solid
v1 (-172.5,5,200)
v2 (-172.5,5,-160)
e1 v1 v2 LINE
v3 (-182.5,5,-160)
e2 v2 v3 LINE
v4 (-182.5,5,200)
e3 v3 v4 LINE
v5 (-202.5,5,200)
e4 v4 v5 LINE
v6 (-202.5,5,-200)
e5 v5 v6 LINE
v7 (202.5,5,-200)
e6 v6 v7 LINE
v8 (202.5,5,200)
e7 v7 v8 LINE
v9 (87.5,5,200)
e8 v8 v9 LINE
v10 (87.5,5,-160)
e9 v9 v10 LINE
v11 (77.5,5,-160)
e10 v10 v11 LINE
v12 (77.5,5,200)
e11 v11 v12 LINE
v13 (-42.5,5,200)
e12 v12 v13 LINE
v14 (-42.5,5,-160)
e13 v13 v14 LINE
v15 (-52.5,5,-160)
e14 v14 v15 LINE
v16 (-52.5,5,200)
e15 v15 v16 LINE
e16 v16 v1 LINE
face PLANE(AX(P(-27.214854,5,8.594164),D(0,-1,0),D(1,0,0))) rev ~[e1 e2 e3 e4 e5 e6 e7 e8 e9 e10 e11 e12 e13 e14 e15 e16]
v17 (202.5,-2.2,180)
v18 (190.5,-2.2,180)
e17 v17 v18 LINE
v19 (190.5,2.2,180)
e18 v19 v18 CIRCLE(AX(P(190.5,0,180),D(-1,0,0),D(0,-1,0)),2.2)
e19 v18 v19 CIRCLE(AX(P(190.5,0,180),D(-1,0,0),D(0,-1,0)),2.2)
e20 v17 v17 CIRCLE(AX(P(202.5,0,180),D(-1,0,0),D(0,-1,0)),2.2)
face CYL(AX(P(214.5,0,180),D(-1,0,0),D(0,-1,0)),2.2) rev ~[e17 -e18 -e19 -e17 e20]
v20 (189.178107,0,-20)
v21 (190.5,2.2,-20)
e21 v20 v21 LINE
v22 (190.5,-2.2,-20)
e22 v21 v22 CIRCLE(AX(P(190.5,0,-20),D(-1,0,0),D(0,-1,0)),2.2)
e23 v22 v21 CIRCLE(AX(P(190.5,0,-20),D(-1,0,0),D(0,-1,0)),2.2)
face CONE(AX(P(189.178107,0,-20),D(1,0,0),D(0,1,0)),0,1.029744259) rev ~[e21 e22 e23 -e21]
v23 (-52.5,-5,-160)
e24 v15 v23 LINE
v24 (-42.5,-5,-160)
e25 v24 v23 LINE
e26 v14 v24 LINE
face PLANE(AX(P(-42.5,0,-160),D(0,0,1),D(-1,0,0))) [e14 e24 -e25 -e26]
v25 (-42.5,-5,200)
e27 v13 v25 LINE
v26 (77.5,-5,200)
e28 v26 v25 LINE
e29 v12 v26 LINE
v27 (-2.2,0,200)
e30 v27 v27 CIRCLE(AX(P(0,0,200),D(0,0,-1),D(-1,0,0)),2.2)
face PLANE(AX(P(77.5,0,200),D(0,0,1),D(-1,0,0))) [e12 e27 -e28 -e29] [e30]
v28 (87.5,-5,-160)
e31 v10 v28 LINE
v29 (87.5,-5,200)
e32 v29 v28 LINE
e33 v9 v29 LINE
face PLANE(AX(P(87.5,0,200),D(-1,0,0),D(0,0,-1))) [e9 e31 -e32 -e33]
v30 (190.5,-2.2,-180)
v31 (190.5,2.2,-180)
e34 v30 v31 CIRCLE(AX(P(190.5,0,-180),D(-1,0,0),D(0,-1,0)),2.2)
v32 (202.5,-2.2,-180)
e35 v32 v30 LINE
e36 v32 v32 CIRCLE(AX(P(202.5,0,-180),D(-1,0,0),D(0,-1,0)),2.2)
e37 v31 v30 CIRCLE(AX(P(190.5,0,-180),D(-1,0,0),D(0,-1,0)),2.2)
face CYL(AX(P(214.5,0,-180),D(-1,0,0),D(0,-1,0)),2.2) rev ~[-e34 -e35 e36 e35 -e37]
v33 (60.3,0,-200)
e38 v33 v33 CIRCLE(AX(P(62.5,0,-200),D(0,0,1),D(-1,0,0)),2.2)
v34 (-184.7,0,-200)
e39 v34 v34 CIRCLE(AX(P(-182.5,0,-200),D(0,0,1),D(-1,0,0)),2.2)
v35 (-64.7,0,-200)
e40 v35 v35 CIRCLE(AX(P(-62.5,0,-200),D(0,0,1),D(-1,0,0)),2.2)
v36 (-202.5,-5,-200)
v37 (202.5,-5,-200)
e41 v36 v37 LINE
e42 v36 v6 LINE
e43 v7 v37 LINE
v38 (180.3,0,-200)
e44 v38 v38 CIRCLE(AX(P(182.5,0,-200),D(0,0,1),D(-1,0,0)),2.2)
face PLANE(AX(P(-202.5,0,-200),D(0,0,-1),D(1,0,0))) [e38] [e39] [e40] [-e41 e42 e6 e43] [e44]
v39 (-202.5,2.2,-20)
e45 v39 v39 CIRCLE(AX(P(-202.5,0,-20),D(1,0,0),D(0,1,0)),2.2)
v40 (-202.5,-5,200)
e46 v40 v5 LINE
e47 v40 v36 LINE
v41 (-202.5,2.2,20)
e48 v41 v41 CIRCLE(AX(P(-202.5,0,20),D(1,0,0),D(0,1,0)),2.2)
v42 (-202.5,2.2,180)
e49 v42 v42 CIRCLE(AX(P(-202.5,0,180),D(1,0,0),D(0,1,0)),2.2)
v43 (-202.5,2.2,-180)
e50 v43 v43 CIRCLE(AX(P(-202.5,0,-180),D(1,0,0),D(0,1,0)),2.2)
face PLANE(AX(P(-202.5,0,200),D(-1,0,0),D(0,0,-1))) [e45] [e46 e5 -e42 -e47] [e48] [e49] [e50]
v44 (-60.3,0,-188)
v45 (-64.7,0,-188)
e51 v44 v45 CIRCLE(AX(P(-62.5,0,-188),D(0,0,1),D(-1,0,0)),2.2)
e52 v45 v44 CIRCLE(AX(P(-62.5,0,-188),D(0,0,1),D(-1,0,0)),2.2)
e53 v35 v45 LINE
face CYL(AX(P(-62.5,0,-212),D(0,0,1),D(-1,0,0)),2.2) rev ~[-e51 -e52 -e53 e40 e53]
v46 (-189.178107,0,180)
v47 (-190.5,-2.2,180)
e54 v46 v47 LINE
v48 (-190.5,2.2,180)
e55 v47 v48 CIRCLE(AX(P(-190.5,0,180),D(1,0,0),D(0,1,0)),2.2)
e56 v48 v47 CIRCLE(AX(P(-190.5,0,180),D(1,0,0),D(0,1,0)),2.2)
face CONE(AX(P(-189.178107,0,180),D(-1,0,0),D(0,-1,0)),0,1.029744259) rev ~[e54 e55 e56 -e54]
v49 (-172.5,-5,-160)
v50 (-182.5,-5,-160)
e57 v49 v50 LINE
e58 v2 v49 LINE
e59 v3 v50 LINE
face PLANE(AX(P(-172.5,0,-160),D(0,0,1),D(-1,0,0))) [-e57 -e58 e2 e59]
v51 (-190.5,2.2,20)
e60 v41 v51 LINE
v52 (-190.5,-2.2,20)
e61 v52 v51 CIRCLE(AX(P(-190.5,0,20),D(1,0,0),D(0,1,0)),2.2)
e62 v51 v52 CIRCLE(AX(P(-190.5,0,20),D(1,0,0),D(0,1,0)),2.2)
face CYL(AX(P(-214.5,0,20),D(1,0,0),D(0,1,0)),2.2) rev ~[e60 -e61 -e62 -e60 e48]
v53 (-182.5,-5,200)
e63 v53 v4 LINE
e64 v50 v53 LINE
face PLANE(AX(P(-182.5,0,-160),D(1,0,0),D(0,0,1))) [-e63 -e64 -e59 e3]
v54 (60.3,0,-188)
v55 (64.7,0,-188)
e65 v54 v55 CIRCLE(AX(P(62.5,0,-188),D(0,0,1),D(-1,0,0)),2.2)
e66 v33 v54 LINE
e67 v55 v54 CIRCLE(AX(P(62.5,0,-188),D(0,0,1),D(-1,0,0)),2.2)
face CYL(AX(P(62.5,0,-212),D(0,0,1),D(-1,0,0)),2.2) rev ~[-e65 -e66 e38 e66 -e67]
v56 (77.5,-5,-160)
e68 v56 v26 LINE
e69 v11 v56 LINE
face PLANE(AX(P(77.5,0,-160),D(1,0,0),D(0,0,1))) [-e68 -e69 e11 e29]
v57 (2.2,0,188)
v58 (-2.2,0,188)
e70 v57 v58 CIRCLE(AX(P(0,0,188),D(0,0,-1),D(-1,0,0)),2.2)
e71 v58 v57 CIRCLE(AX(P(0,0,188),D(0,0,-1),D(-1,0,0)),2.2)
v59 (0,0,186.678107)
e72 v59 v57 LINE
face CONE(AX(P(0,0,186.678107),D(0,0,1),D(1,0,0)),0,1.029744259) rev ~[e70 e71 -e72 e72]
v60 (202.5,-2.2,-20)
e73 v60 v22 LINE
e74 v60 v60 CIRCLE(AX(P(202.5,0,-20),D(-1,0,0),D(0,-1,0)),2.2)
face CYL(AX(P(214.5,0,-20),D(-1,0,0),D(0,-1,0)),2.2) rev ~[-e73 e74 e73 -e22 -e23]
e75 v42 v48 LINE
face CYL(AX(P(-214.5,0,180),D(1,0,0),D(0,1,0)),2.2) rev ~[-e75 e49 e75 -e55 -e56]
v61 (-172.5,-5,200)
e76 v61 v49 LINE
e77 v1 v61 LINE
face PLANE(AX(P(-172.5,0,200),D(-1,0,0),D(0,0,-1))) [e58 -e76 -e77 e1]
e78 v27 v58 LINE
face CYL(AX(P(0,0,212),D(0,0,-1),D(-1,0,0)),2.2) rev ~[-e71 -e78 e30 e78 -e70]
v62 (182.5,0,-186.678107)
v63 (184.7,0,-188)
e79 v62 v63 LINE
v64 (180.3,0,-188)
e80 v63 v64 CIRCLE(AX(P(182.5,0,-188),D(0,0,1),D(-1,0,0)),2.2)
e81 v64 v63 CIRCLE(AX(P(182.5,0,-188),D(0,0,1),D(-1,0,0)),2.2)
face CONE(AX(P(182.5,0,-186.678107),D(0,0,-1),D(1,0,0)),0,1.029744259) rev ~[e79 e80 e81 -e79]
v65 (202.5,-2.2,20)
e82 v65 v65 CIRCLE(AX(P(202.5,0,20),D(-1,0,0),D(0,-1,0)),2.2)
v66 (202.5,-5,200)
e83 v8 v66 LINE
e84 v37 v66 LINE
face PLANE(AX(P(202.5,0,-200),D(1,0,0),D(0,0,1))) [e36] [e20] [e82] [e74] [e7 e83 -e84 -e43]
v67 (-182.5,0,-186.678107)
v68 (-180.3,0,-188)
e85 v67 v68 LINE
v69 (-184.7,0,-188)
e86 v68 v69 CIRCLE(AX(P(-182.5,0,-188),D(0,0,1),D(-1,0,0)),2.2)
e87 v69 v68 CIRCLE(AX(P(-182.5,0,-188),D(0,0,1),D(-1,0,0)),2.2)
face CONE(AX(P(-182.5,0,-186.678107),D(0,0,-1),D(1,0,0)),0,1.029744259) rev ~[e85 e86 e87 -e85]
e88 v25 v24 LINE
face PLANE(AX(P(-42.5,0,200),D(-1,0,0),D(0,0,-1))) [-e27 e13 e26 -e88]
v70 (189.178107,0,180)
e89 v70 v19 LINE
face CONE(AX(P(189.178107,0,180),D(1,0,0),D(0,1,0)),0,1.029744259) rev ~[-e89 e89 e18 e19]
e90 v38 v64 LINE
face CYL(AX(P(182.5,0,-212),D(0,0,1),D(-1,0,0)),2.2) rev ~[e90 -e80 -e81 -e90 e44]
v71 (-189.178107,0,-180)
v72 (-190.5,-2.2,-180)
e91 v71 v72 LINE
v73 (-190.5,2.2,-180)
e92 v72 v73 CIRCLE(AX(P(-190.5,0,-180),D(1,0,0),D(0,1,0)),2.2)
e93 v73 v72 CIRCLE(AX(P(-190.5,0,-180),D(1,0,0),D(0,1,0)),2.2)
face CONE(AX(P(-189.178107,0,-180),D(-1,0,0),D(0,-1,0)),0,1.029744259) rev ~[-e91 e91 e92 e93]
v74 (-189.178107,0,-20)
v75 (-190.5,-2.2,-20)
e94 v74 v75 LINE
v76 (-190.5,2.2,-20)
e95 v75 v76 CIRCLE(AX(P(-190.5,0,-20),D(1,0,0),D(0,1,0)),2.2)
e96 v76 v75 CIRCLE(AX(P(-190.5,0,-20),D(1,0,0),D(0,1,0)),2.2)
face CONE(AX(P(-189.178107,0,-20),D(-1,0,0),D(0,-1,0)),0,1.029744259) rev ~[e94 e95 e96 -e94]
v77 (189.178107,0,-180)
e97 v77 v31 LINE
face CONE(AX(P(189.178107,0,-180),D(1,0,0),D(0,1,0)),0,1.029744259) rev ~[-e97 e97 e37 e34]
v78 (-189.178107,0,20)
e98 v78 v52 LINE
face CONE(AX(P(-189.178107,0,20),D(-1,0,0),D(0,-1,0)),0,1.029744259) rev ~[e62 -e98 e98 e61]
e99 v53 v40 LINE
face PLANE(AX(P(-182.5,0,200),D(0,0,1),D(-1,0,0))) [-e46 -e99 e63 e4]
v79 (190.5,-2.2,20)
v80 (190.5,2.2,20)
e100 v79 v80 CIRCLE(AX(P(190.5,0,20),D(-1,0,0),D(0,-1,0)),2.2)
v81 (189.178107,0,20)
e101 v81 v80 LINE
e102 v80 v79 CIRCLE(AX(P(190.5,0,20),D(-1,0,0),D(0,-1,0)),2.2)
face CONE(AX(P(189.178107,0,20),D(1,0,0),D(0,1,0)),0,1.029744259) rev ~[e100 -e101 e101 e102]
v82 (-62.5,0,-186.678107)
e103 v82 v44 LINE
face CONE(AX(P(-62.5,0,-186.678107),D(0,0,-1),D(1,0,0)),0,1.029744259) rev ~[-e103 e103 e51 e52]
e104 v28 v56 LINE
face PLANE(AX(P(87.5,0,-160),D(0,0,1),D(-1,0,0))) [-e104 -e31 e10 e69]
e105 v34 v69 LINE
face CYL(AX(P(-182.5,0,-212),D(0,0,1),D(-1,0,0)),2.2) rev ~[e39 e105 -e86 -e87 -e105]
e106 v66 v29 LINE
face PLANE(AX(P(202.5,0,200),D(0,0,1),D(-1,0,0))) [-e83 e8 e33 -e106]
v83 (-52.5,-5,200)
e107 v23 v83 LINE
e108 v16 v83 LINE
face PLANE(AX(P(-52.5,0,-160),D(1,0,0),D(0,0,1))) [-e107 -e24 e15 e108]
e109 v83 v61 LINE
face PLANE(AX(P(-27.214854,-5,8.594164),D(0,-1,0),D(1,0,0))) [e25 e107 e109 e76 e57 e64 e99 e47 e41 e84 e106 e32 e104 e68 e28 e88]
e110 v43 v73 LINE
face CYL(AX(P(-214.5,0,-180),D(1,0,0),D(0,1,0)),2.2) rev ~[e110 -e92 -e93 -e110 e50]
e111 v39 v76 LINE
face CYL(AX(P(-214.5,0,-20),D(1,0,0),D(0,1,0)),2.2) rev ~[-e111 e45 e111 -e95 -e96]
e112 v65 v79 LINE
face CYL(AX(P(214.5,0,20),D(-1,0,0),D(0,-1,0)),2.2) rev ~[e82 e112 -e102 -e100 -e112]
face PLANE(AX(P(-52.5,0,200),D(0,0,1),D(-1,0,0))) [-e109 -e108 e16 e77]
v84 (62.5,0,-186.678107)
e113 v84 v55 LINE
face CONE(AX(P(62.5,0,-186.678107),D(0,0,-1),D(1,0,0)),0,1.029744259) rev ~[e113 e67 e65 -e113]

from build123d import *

# Parameters (mm, degrees)
F1_DEPTH       = 5
F6_D           = 4.4
F6_DEPTH       = 12
F6_TIP         = 1.3218933619
F7_D           = 4.4
F7_DEPTH       = 12
F7_TIP         = 1.3218933619
F7_ON_F4_D     = 4.4
F7_ON_F4_DEPTH = 12
F7_ON_F4_TIP   = 1.3218933619
F7_ON_F5_D     = 4.4
F7_ON_F5_DEPTH = 12
F7_ON_F5_TIP   = 1.3218933619


# Not quite as in the source:
# - a feature names something its author has since deleted; it is built from what else it names


with BuildPart() as f1:
    # F0 (on Front) → F1 (new body, symmetric)
    with BuildSketch(Plane.XZ):
        Polygon((-202.5, -200), (202.5, -200), (202.5, 200), (87.5, 200), (87.5, -160), (77.5, -160), (77.5, 200), (-42.5, 200), (-42.5, -160), (-52.5, -160), (-52.5, 200), (-172.5, 200), (-172.5, -160), (-182.5, -160), (-182.5, 200), (-202.5, 200), align=None)
    extrude(amount=F1_DEPTH, both=True)

    # F6
    with Locations(Plane.XY.offset(200)):
        with Locations((0, 0)):
            Hole(F6_D / 2, depth=F6_DEPTH)
            with Locations((0, 0, -(F6_DEPTH + F6_TIP / 2))):  # 118° drill point
                Cone(0, F6_D / 2, F6_TIP, mode=Mode.SUBTRACT)

    # F7
    with Locations(Plane(origin=(-202.5, 0, 0), x_dir=(0, -1, 0), z_dir=(-1, 0, 0))):
        with Locations((0, -180), (0, -20), (0, 20), (0, 180)):
            Hole(F7_D / 2, depth=F7_DEPTH)
            with Locations((0, 0, -(F7_DEPTH + F7_TIP / 2))):  # 118° drill point
                Cone(0, F7_D / 2, F7_TIP, mode=Mode.SUBTRACT)

    # F7 on F4
    with Locations(Plane.YZ.offset(202.5)):
        with Locations((0, -180), (0, -20), (0, 180), (0, 20)):
            Hole(F7_ON_F4_D / 2, depth=F7_ON_F4_DEPTH)
            with Locations((0, 0, -(F7_ON_F4_DEPTH + F7_ON_F4_TIP / 2))):  # 118° drill point
                Cone(0, F7_ON_F4_D / 2, F7_ON_F4_TIP, mode=Mode.SUBTRACT)

    # F7 on F5
    with Locations(Plane(origin=(0, 0, -200), x_dir=(1, 0, 0), z_dir=(0, 0, -1))):
        with Locations((-182.5, 0), (-62.5, 0), (62.5, 0), (182.5, 0)):
            Hole(F7_ON_F5_D / 2, depth=F7_ON_F5_DEPTH)
            with Locations((0, 0, -(F7_ON_F5_DEPTH + F7_ON_F5_TIP / 2))):  # 118° drill point
                Cone(0, F7_ON_F5_D / 2, F7_ON_F5_TIP, mode=Mode.SUBTRACT)


solid = f1.part
